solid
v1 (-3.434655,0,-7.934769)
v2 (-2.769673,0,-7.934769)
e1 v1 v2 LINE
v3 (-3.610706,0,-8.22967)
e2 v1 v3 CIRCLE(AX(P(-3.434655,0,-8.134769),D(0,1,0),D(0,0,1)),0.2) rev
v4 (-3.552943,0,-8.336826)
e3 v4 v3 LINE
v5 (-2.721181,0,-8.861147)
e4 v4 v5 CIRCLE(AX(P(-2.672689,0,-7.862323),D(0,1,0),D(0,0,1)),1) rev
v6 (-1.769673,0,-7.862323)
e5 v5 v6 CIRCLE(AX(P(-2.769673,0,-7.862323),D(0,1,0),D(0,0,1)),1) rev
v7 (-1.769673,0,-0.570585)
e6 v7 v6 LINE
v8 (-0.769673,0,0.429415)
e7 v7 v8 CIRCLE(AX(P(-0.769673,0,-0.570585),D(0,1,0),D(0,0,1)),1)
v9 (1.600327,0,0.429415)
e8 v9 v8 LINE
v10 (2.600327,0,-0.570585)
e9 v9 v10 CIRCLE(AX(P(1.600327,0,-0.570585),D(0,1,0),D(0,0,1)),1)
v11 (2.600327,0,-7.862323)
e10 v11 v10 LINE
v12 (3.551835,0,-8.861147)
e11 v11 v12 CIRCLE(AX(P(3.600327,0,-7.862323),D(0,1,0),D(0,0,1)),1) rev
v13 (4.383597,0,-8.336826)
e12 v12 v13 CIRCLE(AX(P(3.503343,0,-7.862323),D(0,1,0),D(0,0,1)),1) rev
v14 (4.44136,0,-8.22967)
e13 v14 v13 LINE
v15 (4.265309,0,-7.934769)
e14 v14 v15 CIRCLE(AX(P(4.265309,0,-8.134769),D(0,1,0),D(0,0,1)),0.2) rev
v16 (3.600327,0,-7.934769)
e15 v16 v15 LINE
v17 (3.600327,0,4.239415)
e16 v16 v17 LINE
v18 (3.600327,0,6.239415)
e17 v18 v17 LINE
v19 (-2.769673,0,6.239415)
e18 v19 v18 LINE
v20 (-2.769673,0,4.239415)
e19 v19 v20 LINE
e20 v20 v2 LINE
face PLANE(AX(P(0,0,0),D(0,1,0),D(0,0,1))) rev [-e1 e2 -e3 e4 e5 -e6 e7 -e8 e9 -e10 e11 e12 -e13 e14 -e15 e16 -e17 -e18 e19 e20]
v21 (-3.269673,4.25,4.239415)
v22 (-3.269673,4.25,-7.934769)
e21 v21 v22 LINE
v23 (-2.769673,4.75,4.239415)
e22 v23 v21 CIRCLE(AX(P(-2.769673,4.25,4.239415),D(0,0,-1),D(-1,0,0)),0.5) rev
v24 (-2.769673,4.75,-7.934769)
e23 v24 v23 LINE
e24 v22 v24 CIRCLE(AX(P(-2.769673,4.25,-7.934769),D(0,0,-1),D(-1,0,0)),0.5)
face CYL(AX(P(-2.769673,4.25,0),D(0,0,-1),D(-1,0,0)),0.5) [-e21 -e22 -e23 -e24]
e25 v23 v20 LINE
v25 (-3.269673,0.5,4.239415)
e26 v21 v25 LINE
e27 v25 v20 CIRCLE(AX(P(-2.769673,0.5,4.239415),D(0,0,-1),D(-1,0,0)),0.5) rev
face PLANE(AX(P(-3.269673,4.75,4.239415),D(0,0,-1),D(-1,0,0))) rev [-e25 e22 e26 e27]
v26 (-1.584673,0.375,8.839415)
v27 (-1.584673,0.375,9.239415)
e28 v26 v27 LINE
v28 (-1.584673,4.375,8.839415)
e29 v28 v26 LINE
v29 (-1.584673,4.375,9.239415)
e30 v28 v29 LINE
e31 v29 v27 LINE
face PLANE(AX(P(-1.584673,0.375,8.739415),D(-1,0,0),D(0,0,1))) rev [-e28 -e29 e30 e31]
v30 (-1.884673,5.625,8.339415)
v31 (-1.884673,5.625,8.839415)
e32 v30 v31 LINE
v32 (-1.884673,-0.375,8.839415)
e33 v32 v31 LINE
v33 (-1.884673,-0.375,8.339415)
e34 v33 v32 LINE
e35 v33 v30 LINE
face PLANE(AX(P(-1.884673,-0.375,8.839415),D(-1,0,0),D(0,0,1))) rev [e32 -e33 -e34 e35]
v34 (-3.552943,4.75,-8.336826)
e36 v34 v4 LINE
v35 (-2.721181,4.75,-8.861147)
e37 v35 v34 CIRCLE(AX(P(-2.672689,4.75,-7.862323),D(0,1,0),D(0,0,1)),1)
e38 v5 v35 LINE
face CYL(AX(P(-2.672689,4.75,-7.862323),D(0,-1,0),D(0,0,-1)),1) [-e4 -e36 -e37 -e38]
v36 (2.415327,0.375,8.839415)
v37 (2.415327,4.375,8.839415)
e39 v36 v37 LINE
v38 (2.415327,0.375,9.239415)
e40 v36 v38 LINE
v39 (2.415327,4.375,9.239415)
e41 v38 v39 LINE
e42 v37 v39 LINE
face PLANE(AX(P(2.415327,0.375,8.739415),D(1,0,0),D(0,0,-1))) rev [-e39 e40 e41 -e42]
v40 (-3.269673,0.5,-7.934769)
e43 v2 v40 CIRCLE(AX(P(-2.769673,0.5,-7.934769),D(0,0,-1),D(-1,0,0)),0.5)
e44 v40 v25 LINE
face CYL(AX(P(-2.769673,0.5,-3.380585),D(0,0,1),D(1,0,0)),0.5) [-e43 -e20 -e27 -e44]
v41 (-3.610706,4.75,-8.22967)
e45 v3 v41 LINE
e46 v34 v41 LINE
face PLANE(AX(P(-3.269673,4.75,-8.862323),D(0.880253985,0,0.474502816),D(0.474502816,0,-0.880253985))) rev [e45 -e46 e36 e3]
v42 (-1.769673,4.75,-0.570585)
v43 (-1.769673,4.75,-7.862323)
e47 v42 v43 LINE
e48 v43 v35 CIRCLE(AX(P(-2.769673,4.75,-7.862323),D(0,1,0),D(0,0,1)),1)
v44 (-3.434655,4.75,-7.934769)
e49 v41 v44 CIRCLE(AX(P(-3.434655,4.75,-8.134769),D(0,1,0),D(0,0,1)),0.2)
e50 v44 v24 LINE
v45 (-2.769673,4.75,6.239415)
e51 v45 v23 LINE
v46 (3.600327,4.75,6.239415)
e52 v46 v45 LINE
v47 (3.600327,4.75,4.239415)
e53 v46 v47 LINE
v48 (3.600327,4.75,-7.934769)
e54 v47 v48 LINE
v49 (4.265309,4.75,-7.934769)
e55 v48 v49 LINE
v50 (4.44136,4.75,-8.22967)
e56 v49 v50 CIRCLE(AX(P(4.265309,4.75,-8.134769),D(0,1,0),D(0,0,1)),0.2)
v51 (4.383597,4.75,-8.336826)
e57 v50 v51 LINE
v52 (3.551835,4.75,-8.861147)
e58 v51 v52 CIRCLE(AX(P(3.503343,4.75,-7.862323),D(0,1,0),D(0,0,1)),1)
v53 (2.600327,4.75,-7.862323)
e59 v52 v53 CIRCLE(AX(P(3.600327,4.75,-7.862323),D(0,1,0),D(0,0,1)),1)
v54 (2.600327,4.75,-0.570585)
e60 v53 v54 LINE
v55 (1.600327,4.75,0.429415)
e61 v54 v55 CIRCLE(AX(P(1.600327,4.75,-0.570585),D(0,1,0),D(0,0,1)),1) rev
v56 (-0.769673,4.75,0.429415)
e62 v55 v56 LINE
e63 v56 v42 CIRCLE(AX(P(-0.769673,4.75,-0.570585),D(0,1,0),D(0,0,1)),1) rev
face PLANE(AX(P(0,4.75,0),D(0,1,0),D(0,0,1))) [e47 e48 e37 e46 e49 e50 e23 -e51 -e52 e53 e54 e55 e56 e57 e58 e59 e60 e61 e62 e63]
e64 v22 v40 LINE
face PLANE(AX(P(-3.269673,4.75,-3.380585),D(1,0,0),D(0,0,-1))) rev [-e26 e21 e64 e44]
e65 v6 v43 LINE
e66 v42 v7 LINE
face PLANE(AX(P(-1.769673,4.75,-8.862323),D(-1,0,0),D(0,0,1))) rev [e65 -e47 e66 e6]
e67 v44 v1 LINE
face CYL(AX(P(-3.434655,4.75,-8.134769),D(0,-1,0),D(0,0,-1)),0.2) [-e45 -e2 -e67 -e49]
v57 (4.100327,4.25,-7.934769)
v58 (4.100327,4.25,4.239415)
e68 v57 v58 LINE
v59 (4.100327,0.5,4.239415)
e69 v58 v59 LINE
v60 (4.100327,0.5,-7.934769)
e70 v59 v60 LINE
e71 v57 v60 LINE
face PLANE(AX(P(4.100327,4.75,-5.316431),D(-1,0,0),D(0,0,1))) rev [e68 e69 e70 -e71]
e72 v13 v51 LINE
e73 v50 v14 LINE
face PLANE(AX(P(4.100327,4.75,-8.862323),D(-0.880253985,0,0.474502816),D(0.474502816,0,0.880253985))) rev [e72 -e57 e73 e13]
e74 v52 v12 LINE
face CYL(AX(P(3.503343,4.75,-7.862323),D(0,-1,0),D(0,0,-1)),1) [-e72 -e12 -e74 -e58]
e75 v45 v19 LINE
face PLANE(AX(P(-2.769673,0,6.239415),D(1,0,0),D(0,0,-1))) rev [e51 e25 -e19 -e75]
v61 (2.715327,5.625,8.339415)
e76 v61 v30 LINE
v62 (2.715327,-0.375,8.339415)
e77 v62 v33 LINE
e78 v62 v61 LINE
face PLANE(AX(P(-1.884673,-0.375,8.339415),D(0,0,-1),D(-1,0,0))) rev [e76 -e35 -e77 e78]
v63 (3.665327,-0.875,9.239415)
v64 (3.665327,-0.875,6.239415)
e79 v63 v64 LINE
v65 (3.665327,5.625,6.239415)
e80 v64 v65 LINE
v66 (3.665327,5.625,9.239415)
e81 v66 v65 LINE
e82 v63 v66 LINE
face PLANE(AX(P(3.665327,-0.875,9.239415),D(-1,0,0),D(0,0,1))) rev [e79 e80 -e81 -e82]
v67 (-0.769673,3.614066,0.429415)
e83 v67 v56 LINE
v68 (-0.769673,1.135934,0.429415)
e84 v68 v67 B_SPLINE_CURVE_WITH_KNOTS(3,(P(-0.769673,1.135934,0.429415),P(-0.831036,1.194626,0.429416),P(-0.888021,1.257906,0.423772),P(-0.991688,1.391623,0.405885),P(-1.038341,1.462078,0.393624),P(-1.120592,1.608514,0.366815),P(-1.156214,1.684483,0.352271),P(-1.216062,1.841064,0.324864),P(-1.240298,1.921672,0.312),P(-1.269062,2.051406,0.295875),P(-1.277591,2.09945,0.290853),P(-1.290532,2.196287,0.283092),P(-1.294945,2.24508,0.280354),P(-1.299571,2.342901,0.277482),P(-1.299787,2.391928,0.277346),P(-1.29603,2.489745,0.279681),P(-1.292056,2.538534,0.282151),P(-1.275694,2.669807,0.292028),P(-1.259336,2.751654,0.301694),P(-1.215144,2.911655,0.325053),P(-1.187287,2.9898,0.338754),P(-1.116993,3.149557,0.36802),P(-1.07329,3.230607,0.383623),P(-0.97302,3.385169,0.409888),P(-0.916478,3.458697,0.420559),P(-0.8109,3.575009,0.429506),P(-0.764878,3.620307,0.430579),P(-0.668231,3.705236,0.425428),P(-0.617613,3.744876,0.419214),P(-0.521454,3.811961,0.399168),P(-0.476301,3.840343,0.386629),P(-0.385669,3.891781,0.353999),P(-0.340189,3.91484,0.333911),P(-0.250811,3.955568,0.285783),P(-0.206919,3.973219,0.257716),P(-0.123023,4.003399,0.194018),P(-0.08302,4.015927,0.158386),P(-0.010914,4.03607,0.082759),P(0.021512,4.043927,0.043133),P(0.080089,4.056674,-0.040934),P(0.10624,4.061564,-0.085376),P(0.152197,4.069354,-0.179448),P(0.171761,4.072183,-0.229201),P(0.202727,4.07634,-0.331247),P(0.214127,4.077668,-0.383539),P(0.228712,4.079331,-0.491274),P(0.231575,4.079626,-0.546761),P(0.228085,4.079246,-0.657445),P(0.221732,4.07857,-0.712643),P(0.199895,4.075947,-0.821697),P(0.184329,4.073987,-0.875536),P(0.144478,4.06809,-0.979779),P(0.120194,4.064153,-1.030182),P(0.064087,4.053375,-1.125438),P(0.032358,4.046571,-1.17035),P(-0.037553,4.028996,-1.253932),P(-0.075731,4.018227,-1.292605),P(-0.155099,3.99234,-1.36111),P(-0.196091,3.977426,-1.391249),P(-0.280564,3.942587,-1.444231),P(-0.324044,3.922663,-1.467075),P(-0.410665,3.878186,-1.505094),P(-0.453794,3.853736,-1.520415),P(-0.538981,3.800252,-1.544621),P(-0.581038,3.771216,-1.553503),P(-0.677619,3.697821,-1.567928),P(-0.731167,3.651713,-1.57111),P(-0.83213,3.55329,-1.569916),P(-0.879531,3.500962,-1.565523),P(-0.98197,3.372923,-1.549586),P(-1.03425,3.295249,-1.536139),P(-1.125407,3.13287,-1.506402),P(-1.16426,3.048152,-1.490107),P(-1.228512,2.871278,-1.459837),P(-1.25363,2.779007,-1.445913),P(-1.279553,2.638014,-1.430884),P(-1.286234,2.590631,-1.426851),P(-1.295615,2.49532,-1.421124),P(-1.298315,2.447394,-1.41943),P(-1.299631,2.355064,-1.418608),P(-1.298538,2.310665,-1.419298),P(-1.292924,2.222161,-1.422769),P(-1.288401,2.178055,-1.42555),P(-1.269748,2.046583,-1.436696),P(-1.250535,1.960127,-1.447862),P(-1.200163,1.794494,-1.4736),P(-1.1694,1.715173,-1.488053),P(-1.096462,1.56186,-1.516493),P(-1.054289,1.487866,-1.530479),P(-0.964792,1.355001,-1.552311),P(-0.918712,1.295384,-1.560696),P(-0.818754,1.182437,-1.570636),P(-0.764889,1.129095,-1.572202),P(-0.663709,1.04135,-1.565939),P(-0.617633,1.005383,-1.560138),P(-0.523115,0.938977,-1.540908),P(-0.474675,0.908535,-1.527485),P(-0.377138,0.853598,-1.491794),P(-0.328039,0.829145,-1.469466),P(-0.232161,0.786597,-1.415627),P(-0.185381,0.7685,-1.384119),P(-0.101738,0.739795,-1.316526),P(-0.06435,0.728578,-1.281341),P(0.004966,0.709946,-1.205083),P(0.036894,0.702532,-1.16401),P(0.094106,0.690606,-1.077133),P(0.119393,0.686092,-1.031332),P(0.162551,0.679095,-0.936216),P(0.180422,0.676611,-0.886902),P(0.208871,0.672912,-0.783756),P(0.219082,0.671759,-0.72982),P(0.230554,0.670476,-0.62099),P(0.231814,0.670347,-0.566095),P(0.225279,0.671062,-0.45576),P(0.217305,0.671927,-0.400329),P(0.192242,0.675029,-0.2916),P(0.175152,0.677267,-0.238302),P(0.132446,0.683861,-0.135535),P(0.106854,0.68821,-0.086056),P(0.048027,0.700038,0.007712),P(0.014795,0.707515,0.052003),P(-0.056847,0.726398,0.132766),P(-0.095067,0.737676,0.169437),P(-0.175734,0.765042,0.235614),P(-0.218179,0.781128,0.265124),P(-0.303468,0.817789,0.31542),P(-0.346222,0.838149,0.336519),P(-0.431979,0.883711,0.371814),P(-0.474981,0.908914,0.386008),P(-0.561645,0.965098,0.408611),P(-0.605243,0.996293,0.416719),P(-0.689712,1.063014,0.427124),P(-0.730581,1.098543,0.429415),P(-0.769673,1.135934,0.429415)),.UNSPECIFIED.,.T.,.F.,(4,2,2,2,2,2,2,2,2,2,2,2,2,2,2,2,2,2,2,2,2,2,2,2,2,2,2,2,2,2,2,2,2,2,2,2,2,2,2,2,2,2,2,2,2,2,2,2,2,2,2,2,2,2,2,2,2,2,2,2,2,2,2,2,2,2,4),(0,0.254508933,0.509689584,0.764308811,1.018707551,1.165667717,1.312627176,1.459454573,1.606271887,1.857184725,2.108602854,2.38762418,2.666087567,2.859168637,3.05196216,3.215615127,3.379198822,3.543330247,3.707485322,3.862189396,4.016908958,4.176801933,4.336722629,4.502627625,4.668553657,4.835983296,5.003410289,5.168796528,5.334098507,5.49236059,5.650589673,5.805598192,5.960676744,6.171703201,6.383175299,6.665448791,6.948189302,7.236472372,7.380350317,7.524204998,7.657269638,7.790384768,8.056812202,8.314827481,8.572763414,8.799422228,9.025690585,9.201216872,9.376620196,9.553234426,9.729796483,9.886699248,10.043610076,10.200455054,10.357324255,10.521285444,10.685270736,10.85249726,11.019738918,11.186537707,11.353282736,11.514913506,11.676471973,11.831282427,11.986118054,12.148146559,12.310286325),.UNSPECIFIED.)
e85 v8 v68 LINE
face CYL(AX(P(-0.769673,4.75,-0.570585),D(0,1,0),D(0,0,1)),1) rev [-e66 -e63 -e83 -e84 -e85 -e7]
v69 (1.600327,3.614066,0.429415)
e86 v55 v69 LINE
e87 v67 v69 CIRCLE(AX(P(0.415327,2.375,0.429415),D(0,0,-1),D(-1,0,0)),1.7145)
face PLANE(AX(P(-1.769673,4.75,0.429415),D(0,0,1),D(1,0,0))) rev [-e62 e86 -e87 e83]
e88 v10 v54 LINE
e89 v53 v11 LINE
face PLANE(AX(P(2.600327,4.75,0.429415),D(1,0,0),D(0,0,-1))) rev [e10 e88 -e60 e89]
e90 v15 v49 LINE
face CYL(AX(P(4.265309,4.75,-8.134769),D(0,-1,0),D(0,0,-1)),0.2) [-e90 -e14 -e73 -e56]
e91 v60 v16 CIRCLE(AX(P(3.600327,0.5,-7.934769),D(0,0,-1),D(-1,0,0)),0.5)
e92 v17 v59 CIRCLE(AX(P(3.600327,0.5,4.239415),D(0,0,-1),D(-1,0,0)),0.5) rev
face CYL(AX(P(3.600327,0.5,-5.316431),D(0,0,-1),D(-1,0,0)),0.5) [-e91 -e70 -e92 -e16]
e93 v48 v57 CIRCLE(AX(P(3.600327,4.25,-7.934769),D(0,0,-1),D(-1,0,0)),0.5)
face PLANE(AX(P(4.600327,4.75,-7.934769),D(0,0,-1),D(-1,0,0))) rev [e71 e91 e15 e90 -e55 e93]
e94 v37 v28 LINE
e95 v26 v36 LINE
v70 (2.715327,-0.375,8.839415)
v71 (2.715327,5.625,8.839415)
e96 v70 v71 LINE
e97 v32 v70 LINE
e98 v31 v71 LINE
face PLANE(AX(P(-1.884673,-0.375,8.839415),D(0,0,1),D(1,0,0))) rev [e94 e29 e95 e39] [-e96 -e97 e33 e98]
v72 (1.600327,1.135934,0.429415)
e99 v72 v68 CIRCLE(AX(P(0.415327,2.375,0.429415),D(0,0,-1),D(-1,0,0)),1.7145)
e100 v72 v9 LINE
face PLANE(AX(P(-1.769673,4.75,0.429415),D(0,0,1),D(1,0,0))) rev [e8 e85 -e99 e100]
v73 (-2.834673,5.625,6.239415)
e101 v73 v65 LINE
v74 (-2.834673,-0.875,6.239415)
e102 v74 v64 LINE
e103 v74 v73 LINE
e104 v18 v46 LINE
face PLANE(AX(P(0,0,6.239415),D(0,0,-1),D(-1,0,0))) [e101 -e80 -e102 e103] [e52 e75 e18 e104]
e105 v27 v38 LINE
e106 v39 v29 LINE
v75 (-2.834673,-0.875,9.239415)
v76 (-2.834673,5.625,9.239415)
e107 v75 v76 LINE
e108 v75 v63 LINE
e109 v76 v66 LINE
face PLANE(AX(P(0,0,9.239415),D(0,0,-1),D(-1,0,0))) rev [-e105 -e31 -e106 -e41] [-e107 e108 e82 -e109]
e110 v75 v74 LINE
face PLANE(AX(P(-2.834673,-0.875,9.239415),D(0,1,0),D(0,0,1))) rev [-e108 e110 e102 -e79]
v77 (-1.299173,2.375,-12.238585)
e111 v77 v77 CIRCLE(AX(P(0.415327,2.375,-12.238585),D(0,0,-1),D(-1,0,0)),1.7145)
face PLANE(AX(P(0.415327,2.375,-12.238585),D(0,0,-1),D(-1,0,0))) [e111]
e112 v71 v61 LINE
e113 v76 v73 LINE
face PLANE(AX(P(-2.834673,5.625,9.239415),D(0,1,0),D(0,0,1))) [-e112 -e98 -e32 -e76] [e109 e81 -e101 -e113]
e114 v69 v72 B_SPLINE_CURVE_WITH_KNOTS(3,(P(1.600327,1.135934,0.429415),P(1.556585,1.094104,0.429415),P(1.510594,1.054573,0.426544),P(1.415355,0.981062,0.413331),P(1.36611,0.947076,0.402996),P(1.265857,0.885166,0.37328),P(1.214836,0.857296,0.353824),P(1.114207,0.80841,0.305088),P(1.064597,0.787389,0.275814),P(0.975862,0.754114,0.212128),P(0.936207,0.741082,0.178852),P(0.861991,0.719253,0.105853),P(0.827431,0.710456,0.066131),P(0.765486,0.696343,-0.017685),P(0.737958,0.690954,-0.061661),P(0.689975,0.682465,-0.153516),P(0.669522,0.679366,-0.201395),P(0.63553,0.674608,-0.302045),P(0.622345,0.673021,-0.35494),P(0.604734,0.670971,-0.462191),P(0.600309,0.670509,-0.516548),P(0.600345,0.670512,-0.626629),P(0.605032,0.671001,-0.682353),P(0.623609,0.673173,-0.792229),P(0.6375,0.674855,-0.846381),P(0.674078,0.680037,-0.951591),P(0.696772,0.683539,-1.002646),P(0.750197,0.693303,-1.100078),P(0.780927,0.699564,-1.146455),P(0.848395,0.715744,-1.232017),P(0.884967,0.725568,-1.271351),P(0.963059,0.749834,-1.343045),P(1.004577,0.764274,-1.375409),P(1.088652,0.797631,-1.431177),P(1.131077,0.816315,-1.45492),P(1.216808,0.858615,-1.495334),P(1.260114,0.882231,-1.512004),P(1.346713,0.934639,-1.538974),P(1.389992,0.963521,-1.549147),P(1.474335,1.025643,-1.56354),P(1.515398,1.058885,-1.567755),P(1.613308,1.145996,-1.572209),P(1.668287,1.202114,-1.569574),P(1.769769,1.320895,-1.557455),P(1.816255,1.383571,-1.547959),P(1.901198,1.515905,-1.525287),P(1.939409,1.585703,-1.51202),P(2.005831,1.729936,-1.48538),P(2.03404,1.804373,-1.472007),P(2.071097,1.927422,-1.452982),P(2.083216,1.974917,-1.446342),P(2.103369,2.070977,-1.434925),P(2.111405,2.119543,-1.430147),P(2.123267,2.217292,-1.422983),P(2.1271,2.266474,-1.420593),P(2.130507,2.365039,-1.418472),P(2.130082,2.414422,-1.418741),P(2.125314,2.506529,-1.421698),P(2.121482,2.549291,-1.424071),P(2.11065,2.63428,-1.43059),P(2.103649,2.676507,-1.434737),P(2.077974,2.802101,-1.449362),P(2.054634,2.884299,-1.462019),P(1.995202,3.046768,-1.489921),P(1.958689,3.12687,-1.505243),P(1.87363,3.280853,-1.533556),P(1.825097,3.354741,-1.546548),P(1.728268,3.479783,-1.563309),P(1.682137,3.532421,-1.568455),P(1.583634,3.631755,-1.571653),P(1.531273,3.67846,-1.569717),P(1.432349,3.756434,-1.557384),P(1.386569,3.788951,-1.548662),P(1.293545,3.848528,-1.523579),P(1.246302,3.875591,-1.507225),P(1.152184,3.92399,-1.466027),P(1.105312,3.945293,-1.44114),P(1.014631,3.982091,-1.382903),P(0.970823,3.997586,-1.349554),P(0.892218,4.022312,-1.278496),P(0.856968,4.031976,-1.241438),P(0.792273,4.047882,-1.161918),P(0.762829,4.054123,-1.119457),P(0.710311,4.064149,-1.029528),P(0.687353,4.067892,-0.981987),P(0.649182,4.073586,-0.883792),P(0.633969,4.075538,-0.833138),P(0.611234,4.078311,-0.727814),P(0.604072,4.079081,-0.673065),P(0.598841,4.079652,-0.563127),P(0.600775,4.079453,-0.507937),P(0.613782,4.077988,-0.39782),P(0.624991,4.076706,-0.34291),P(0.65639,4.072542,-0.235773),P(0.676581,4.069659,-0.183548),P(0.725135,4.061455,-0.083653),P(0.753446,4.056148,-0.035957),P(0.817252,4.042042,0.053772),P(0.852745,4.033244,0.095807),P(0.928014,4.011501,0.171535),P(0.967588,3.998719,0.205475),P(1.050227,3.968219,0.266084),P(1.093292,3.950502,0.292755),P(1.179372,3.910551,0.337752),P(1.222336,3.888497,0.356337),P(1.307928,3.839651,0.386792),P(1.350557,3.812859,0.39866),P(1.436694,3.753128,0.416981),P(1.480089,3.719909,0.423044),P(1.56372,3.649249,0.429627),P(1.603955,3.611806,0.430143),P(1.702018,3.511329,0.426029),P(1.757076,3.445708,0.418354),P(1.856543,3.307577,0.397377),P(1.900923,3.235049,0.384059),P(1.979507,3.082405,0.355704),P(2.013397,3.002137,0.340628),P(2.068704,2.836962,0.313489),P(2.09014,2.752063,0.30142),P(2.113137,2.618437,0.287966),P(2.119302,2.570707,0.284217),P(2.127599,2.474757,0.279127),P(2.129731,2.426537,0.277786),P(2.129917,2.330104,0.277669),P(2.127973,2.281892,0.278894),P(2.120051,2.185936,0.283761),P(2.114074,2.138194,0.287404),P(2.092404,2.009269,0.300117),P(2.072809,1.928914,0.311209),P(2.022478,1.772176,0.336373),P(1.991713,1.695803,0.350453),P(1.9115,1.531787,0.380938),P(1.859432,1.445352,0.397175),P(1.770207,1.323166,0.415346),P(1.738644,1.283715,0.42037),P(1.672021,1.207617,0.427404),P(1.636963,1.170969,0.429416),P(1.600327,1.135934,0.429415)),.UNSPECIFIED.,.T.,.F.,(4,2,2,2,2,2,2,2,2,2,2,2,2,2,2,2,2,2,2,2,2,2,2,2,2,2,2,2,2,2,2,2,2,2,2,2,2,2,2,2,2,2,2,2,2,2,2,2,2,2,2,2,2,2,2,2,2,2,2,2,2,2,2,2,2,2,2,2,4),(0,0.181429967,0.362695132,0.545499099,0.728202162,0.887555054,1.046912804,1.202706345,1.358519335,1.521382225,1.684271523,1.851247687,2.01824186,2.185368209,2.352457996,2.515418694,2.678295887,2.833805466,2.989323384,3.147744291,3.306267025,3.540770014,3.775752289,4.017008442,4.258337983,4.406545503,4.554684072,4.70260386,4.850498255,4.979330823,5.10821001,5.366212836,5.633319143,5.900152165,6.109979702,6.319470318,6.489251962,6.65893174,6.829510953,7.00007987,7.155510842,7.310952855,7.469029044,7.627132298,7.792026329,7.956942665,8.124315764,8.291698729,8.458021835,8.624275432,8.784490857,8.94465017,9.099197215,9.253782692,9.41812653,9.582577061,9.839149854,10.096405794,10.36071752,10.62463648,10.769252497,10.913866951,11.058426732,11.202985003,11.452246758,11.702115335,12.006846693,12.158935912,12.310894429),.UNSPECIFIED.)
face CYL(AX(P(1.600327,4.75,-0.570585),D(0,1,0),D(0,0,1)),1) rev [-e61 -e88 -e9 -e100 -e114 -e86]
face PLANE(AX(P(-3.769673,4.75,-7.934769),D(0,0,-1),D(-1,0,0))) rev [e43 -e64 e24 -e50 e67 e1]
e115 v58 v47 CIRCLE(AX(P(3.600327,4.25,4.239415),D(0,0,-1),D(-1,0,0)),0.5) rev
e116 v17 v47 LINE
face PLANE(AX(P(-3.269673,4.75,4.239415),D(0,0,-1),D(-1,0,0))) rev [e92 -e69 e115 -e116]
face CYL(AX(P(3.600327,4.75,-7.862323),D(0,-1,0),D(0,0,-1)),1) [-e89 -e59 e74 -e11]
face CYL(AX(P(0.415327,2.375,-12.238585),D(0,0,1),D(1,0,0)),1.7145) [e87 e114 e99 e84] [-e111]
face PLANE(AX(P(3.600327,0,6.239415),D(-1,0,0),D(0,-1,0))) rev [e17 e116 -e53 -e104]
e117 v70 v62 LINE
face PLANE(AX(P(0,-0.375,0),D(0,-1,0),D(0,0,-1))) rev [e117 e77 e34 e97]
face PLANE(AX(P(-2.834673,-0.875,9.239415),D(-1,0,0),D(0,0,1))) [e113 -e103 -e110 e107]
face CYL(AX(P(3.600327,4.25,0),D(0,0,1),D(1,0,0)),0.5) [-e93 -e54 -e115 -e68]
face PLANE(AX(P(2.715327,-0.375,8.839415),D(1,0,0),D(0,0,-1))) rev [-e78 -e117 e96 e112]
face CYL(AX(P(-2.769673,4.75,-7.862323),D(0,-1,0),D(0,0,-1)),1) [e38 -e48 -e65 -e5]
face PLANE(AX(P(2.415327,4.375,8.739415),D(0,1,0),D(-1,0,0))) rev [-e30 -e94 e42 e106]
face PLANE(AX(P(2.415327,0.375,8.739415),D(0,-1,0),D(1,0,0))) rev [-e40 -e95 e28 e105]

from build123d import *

# Parameters (mm, degrees)
BOSS_EXTRUDE1_DEPTH = 4.75
FILLET2_R           = 0.2
FILLET3_R           = 1
FILLET5_R           = 0.5
FILLET6_R           = 1
SKETCH3_W           = 6.37
SKETCH3_H           = 4.75
BOSS_EXTRUDE2_DEPTH = 2
SKETCH4_W           = 6.5
SKETCH4_H           = 6.5
BOSS_EXTRUDE3_DEPTH = 3
SKETCH5_W           = 4.6
SKETCH5_H           = 0.5
CUT_EXTRUDE1_DEPTH  = 6
SKETCH8_W           = 4
SKETCH8_H           = 4
CUT_EXTRUDE2_DEPTH  = 0.5
SKETCH9_R           = 1.7145
BOSS_EXTRUDE4_DEPTH = 12.668


with BuildPart() as part:
    # Sketch2 → Boss-Extrude1 (new body)
    with BuildSketch(Plane(origin=(0, 0, 0), x_dir=(1, 0, 0), z_dir=(0, 1, 0))):
        Polygon((-3.269672992, 3.380584559), (-3.269672992, 7.934769302), (-3.769672992, 7.934769302), (-3.269672992, 8.862323318), (-1.769672992, 8.862323318), (-1.769672992, 3.380584559), (-1.769672992, -0.429415441), (2.600327008, -0.429415441), (2.600327008, 3.380584559), (2.600327008, 8.862323318), (4.100327008, 8.862323318), (4.600327008, 7.934769302), (4.100327008, 7.934769302), (4.100327008, 5.316430627), (4.100327008, -4.239415441), (-3.269672992, -4.239415441), align=None)
    extrude(amount=BOSS_EXTRUDE1_DEPTH)

    # Fillet2
    fillet2_edges = [part.edges().sort_by_distance(p)[0] for p in [
        (-3.769672992, 2.375, -7.934769302),
        (4.600327008, 2.375, -7.934769302),
    ]]
    fillet(fillet2_edges, radius=FILLET2_R)

    # Fillet3
    # the kernel refuses this fillet: 1 mm, written as the material it takes off along each edge
    with BuildSketch(Plane(origin=(-1.769672992, -2.5, -8.862323318), x_dir=(-1, 0, 0), z_dir=(0, 1, 0)), Plane(origin=(2.600327008, -2.5, -8.862323318), x_dir=(0, 0, 1), z_dir=(0, 1, 0))) as fillet3_piece_1:
        with BuildLine():
            CenterArc((FILLET3_R, FILLET3_R), FILLET3_R, 180, 90)
            Line((0, FILLET3_R), (0, 0))
            Line((0, 0), (FILLET3_R, 0))
        make_face()
    extrude(amount=9.75, mode=Mode.SUBTRACT)
    with BuildSketch(Plane(origin=(4.100327008, -1.492458976, -8.862323318), x_dir=(0.47450281579704723, 0, 0.8802539848252171), z_dir=(0, 1, 0))) as fillet3_piece_2:
        with BuildLine():
            CenterArc((FILLET3_R * 0.596983590262, -FILLET3_R), FILLET3_R, 90, 61.673016648)
            Line((-FILLET3_R * 0.283270394564, -FILLET3_R * 0.525497184203), (0, 0))
            Line((0, 0), (FILLET3_R * 0.596983590262, 0))
        make_face()
    extrude(amount=7.734917951, mode=Mode.SUBTRACT)
    with BuildSketch(Plane(origin=(-3.269672992, -1.492458976, -8.862323318), x_dir=(-0.474502815797046, 0, 0.8802539848252178), z_dir=(0, 1, 0))) as fillet3_piece_3:
        with BuildLine():
            CenterArc((FILLET3_R * 0.596983590262, FILLET3_R), FILLET3_R, 208.326983352, 61.673016648)
            Line((-FILLET3_R * 0.283270394564, FILLET3_R * 0.525497184203), (0, 0))
            Line((0, 0), (FILLET3_R * 0.596983590262, 0))
        make_face()
    extrude(amount=7.734917951, mode=Mode.SUBTRACT)

    # Fillet5
    fillet5_edges = [part.edges().sort_by_distance(p)[0] for p in [
        (-3.269672992, 0, -1.84767693),
        (4.100327008, 0, -1.84767693),
        (4.100327008, 4.75, -1.84767693),
        (-3.269672992, 4.75, -1.84767693),
    ]]
    fillet(fillet5_edges, radius=FILLET5_R)

    # Fillet6
    fillet6_edges = [part.edges().sort_by_distance(p)[0] for p in [
        (-1.769672992, 2.375, 0.429415441),
        (2.600327008, 2.375, 0.429415441),
    ]]
    fillet(fillet6_edges, radius=FILLET6_R)

    # Sketch3 → Boss-Extrude2 (add)
    with BuildSketch(Plane.XY.offset(4.239415441)):
        with Locations((0.415327008, 2.375)):
            Rectangle(SKETCH3_W, SKETCH3_H)
    extrude(amount=BOSS_EXTRUDE2_DEPTH)

    # Sketch4 → Boss-Extrude3 (add)
    with BuildSketch(Plane.XY.offset(6.239415441)):
        with Locations((0.415327008, 2.375)):
            Rectangle(SKETCH4_W, SKETCH4_H)
    extrude(amount=BOSS_EXTRUDE3_DEPTH)

    # Sketch5 → Cut-Extrude1 (cut)
    with BuildSketch(Plane(origin=(0, 5.625, 0), x_dir=(1, 0, 0), z_dir=(0, 1, 0))):
        with Locations((0.415327008, -8.589415441)):
            Rectangle(SKETCH5_W, SKETCH5_H)
    extrude(amount=-CUT_EXTRUDE1_DEPTH, mode=Mode.SUBTRACT)

    # Sketch8 → Cut-Extrude2 (cut)
    with BuildSketch(Plane.XY.offset(9.239415441)):
        with Locations((0.415327008, 2.375)):
            Rectangle(SKETCH8_W, SKETCH8_H)
    extrude(amount=-CUT_EXTRUDE2_DEPTH, mode=Mode.SUBTRACT)

    # Sketch9 → Boss-Extrude4 (add)
    with BuildSketch(Plane(origin=(0, 0, 0.429415441), x_dir=(-1, 0, 0), z_dir=(0, 0, -1))):
        with Locations(Location((-0.415327008, 2.375, 0), (0, 0, 133.722288973))):
            Circle(SKETCH9_R)
    extrude(amount=BOSS_EXTRUDE4_DEPTH)


solid = part.part
